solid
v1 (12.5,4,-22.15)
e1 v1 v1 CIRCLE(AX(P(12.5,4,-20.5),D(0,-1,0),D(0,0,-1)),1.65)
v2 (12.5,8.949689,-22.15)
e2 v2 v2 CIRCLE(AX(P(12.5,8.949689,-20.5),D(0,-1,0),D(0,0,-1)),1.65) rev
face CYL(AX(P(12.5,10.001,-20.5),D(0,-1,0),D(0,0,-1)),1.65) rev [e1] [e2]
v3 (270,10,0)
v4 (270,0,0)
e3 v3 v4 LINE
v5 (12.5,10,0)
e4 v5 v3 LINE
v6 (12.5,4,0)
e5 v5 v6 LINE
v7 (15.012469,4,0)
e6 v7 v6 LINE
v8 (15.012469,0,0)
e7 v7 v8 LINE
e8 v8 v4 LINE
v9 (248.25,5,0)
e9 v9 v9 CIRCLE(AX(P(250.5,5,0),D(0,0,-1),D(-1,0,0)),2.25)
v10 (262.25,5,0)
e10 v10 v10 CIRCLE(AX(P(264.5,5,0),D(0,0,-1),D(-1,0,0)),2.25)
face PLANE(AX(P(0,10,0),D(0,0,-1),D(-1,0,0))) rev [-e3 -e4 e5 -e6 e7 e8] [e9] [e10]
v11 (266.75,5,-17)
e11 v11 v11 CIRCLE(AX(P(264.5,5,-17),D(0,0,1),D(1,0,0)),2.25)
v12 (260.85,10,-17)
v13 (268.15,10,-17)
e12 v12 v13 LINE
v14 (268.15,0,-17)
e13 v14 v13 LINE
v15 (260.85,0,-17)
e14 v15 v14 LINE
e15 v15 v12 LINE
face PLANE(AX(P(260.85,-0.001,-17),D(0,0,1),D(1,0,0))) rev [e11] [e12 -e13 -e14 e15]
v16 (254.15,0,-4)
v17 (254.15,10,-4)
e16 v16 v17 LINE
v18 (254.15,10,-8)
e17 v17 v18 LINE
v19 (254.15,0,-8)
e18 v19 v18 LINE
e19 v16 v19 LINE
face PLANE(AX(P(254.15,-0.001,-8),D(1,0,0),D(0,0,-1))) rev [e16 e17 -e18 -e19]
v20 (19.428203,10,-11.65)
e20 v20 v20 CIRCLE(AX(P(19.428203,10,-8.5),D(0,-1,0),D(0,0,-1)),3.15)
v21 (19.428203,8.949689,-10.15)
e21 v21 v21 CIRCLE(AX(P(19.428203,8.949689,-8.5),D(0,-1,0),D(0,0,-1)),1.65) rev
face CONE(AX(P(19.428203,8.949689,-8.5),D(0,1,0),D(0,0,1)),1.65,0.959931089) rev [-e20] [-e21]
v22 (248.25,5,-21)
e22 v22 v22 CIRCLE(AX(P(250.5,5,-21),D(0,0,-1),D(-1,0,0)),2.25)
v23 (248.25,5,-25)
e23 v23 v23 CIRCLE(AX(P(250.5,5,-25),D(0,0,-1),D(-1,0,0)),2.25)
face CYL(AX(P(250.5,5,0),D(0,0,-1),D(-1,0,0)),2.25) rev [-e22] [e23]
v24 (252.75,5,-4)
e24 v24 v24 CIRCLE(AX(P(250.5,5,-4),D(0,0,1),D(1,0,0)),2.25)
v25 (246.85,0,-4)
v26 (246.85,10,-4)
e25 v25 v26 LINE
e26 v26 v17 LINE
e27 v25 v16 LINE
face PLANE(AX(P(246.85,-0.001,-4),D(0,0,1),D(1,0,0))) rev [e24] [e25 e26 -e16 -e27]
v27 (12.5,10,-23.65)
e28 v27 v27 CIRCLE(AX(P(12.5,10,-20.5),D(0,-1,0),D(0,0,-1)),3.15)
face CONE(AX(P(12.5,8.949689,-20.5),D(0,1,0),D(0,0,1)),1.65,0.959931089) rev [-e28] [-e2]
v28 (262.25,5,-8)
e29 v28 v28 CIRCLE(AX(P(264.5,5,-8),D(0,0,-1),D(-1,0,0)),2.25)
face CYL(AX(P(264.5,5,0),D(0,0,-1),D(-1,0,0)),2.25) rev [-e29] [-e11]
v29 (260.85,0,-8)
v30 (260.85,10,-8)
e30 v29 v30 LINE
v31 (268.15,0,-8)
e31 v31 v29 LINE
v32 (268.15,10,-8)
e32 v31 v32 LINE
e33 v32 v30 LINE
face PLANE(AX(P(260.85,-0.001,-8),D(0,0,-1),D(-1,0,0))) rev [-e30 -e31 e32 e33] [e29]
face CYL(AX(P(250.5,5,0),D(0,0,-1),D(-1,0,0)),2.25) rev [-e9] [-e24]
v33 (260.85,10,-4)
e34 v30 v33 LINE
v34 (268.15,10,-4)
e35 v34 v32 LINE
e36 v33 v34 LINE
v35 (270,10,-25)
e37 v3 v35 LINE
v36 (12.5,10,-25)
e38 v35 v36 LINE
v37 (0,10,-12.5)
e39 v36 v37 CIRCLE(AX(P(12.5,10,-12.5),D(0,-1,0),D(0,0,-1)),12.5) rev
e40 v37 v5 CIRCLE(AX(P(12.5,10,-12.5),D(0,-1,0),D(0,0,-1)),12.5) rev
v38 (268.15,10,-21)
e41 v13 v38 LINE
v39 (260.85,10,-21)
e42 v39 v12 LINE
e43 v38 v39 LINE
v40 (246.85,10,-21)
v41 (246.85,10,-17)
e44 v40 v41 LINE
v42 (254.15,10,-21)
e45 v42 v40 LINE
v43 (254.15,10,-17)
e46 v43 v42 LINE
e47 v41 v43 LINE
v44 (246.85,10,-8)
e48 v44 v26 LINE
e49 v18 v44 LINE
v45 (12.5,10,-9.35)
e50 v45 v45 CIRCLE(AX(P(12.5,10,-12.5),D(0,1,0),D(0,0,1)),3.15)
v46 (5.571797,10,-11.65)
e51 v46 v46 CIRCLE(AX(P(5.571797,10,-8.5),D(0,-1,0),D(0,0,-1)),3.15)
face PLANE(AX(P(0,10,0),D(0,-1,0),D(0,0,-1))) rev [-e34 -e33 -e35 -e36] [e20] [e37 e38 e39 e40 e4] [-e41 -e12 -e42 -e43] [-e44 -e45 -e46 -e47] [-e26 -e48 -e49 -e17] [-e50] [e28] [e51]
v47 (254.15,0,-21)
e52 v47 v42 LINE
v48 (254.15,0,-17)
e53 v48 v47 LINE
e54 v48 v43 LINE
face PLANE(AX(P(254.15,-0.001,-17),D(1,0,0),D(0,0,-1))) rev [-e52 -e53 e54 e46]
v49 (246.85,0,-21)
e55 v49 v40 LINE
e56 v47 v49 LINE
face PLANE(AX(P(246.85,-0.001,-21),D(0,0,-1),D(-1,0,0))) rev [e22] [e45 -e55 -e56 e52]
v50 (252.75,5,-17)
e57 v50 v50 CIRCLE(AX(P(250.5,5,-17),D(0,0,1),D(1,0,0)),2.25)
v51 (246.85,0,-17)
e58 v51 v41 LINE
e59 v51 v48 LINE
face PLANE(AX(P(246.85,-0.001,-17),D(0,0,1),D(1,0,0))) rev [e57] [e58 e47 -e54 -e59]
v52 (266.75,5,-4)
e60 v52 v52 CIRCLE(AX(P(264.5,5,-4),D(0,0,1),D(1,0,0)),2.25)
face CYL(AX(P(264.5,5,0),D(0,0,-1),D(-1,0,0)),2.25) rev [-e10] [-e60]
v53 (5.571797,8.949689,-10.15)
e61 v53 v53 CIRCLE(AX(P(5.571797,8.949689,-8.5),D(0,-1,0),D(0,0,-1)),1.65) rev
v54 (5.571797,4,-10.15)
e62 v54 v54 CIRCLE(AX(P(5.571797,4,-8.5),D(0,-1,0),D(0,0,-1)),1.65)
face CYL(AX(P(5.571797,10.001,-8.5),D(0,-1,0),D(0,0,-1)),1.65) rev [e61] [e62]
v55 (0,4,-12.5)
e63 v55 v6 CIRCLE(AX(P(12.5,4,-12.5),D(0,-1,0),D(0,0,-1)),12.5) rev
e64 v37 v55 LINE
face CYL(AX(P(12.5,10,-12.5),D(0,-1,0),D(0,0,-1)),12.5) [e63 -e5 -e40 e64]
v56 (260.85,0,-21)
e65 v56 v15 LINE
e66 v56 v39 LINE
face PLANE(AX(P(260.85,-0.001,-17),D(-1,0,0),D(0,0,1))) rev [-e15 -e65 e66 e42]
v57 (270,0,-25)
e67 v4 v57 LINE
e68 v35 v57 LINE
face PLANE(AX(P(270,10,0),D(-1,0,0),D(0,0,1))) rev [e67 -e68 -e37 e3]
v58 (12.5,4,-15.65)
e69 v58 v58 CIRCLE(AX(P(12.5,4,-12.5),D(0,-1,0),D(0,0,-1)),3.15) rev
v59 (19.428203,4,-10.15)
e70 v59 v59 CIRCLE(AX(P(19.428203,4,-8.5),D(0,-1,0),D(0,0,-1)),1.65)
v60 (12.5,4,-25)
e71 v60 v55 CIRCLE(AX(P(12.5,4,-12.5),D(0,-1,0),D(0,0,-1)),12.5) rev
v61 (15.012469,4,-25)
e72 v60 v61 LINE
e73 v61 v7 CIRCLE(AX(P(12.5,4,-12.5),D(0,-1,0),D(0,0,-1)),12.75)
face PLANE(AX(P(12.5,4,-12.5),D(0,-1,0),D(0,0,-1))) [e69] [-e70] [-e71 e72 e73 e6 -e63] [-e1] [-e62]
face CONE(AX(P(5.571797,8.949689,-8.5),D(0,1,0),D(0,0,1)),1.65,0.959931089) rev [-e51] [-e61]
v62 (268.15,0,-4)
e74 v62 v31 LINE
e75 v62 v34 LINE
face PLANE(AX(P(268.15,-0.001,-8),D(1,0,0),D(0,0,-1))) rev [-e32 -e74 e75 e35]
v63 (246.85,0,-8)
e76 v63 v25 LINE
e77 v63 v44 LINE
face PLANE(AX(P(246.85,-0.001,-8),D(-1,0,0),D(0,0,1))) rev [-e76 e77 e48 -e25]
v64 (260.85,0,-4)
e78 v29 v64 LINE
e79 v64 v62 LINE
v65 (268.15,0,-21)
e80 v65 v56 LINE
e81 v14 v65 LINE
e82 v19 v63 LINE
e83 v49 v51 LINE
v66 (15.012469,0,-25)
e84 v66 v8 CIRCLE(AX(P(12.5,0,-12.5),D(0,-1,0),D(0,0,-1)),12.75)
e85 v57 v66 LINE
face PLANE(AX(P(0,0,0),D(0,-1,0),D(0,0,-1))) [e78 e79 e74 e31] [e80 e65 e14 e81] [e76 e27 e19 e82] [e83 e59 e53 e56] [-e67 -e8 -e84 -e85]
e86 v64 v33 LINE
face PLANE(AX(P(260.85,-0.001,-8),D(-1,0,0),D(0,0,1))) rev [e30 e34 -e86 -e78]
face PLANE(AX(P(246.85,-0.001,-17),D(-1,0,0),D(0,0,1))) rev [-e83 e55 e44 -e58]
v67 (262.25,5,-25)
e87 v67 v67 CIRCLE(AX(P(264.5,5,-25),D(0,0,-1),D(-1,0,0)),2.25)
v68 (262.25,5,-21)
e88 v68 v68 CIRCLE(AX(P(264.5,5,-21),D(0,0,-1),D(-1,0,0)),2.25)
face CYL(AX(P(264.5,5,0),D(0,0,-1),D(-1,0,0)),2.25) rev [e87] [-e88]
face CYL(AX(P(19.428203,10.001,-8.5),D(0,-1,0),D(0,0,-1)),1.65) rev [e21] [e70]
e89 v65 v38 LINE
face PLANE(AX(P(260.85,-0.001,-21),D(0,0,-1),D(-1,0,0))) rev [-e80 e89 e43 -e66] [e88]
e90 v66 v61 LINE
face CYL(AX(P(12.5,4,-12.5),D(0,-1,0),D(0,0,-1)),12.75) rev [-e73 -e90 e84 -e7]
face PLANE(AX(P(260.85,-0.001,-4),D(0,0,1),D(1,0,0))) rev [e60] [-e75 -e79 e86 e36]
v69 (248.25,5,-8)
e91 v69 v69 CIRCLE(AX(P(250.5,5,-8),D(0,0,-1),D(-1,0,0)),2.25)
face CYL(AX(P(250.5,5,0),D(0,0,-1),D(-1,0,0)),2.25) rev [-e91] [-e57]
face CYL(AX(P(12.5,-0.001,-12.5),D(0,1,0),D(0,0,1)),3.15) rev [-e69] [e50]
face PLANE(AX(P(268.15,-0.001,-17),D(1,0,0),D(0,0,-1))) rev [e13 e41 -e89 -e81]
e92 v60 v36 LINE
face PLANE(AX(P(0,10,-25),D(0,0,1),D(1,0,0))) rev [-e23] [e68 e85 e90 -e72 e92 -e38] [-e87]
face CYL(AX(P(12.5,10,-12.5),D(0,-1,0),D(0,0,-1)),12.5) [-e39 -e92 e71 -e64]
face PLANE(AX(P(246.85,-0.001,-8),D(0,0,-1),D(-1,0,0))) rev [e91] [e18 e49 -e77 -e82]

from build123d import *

# Parameters (mm, degrees)
SKETCH1_W           = 270
SKETCH1_H           = 25
BOSS_EXTRUDE1_DEPTH = 10
CUT_EXTRUDE1_REACH  = 273.339
SKETCH2_R           = 3.15
FILLET1_R           = 12.5
SKETCH3_R           = 2.25
CUT_EXTRUDE2_DEPTH  = 272.339271024
CUT_EXTRUDE5_REACH  = 273.339
SKETCH5_W           = 7.3
SKETCH5_H           = 4
SKETCH6_R           = 12.75
CUT_EXTRUDE6_DEPTH  = 4
CUT_EXTRUDE7_REACH  = 273.221
SKETCH7_R           = 1.65
CHAMFER1_SIZE       = 1.5
CHAMFER1_SIZE2      = 1.050311307


with BuildPart() as part:
    # Sketch1 → Boss-Extrude1 (new body)
    with BuildSketch(Plane(origin=(0, 0, 0), x_dir=(1, 0, 0), z_dir=(0, 1, 0))):
        with Locations((135, 12.5)):
            Rectangle(SKETCH1_W, SKETCH1_H)
    extrude(amount=BOSS_EXTRUDE1_DEPTH)

    # Sketch2 → Cut-Extrude1 (cut, up to next)
    with BuildSketch(Plane(origin=(0, 10, 0), x_dir=(1, 0, 0), z_dir=(0, 1, 0)), mode=Mode.PRIVATE) as cut_extrude1_sk1:
        with Locations(Location((12.5, 12.5, 0), (0, 0, 270))):
            Circle(SKETCH2_R)
    cut_extrude1_tool1 = extrude(cut_extrude1_sk1.sketch, amount=-CUT_EXTRUDE1_REACH, mode=Mode.PRIVATE) & part.part
    add(cut_extrude1_tool1.solids().sort_by_distance((12.5, 10, -12.5))[0], mode=Mode.SUBTRACT)

    # Fillet1
    fillet1_edges = [part.edges().sort_by_distance(p)[0] for p in [
        (0, 5, 0),
        (0, 5, -25),
    ]]
    fillet(fillet1_edges, radius=FILLET1_R - 0.0001)  # a hair under: the kernel refuses the full size

    # Sketch3 → Cut-Extrude2 (cut, through all)
    with BuildSketch(Plane(origin=(0, 0, -25), x_dir=(-1, 0, 0), z_dir=(0, 0, -1))):
        with Locations((-264.5, 5)):
            Circle(SKETCH3_R)
        with Locations((-250.5, 5)):
            Circle(SKETCH3_R)
    extrude(amount=-CUT_EXTRUDE2_DEPTH, mode=Mode.SUBTRACT)

    # Sketch5 → Cut-Extrude5 (cut, up to next)
    with BuildSketch(Plane(origin=(0, 10, 0), x_dir=(1, 0, 0), z_dir=(0, 1, 0)), mode=Mode.PRIVATE) as cut_extrude5_sk1:
        with Locations((264.5, 19)):
            Rectangle(SKETCH5_W, SKETCH5_H)
    cut_extrude5_tool1 = extrude(cut_extrude5_sk1.sketch, amount=-CUT_EXTRUDE5_REACH, mode=Mode.PRIVATE) & part.part
    # Sketch5 → Cut-Extrude5 (cut, up to next)
    with BuildSketch(Plane(origin=(0, 10, 0), x_dir=(1, 0, 0), z_dir=(0, 1, 0)), mode=Mode.PRIVATE) as cut_extrude5_sk2:
        with Locations((264.5, 6)):
            Rectangle(SKETCH5_W, SKETCH5_H)
    cut_extrude5_tool2 = extrude(cut_extrude5_sk2.sketch, amount=-CUT_EXTRUDE5_REACH, mode=Mode.PRIVATE) & part.part
    # Sketch5 → Cut-Extrude5 (cut, up to next)
    with BuildSketch(Plane(origin=(0, 10, 0), x_dir=(1, 0, 0), z_dir=(0, 1, 0)), mode=Mode.PRIVATE) as cut_extrude5_sk3:
        with Locations((250.5, 19)):
            Rectangle(SKETCH5_W, SKETCH5_H)
    cut_extrude5_tool3 = extrude(cut_extrude5_sk3.sketch, amount=-CUT_EXTRUDE5_REACH, mode=Mode.PRIVATE) & part.part
    # Sketch5 → Cut-Extrude5 (cut, up to next)
    with BuildSketch(Plane(origin=(0, 10, 0), x_dir=(1, 0, 0), z_dir=(0, 1, 0)), mode=Mode.PRIVATE) as cut_extrude5_sk4:
        with Locations((250.5, 6)):
            Rectangle(SKETCH5_W, SKETCH5_H)
    cut_extrude5_tool4 = extrude(cut_extrude5_sk4.sketch, amount=-CUT_EXTRUDE5_REACH, mode=Mode.PRIVATE) & part.part
    add(cut_extrude5_tool1.solids().sort_by_distance((264.5, 10, -19))[0], mode=Mode.SUBTRACT)
    add(cut_extrude5_tool2.solids().sort_by_distance((264.5, 10, -6))[0], mode=Mode.SUBTRACT)
    add(cut_extrude5_tool3.solids().sort_by_distance((250.5, 10, -19))[0], mode=Mode.SUBTRACT)
    add(cut_extrude5_tool4.solids().sort_by_distance((250.5, 10, -6))[0], mode=Mode.SUBTRACT)

    # Sketch6 → Cut-Extrude6 (cut)
    with BuildSketch(Plane.XZ):
        with Locations((12.5, -12.5)):
            Circle(SKETCH6_R)
    extrude(amount=-CUT_EXTRUDE6_DEPTH, mode=Mode.SUBTRACT)

    # Sketch7 → Cut-Extrude7 (cut, up to next)
    with BuildSketch(Plane.XZ.offset(-4), mode=Mode.PRIVATE) as cut_extrude7_sk1:
        with Locations(Location((12.5, -20.5, 0), (0, 0, 270))):
            Circle(SKETCH7_R)
    cut_extrude7_tool1 = extrude(cut_extrude7_sk1.sketch, amount=-CUT_EXTRUDE7_REACH, mode=Mode.PRIVATE) & part.part
    # Sketch7 → Cut-Extrude7 (cut, up to next)
    with BuildSketch(Plane.XZ.offset(-4), mode=Mode.PRIVATE) as cut_extrude7_sk2:
        with Locations(Location((5.57179677, -8.5, 0), (0, 0, 270))):
            Circle(SKETCH7_R)
    cut_extrude7_tool2 = extrude(cut_extrude7_sk2.sketch, amount=-CUT_EXTRUDE7_REACH, mode=Mode.PRIVATE) & part.part
    # Sketch7 → Cut-Extrude7 (cut, up to next)
    with BuildSketch(Plane.XZ.offset(-4), mode=Mode.PRIVATE) as cut_extrude7_sk3:
        with Locations(Location((19.42820323, -8.5, 0), (0, 0, 270))):
            Circle(SKETCH7_R)
    cut_extrude7_tool3 = extrude(cut_extrude7_sk3.sketch, amount=-CUT_EXTRUDE7_REACH, mode=Mode.PRIVATE) & part.part
    add(cut_extrude7_tool1.solids().sort_by_distance((12.5, 4, -20.5))[0], mode=Mode.SUBTRACT)
    add(cut_extrude7_tool2.solids().sort_by_distance((5.571797, 4, -8.5))[0], mode=Mode.SUBTRACT)
    add(cut_extrude7_tool3.solids().sort_by_distance((19.428203, 4, -8.5))[0], mode=Mode.SUBTRACT)

    # Chamfer1
    chamfer1_edges = [part.edges().sort_by_distance(p)[0] for p in [
        (12.5, 10, -18.85),
        (5.57179677, 10, -6.85),
        (19.42820323, 10, -6.85),
    ]]
    chamfer1_side = [part.faces().sort_by_distance(p)[0] for p in [
        (135.233508086, 10, -12.5),
    ]]
    chamfer(chamfer1_edges, length=CHAMFER1_SIZE, length2=CHAMFER1_SIZE2, reference=chamfer1_side[0])


solid = part.part
